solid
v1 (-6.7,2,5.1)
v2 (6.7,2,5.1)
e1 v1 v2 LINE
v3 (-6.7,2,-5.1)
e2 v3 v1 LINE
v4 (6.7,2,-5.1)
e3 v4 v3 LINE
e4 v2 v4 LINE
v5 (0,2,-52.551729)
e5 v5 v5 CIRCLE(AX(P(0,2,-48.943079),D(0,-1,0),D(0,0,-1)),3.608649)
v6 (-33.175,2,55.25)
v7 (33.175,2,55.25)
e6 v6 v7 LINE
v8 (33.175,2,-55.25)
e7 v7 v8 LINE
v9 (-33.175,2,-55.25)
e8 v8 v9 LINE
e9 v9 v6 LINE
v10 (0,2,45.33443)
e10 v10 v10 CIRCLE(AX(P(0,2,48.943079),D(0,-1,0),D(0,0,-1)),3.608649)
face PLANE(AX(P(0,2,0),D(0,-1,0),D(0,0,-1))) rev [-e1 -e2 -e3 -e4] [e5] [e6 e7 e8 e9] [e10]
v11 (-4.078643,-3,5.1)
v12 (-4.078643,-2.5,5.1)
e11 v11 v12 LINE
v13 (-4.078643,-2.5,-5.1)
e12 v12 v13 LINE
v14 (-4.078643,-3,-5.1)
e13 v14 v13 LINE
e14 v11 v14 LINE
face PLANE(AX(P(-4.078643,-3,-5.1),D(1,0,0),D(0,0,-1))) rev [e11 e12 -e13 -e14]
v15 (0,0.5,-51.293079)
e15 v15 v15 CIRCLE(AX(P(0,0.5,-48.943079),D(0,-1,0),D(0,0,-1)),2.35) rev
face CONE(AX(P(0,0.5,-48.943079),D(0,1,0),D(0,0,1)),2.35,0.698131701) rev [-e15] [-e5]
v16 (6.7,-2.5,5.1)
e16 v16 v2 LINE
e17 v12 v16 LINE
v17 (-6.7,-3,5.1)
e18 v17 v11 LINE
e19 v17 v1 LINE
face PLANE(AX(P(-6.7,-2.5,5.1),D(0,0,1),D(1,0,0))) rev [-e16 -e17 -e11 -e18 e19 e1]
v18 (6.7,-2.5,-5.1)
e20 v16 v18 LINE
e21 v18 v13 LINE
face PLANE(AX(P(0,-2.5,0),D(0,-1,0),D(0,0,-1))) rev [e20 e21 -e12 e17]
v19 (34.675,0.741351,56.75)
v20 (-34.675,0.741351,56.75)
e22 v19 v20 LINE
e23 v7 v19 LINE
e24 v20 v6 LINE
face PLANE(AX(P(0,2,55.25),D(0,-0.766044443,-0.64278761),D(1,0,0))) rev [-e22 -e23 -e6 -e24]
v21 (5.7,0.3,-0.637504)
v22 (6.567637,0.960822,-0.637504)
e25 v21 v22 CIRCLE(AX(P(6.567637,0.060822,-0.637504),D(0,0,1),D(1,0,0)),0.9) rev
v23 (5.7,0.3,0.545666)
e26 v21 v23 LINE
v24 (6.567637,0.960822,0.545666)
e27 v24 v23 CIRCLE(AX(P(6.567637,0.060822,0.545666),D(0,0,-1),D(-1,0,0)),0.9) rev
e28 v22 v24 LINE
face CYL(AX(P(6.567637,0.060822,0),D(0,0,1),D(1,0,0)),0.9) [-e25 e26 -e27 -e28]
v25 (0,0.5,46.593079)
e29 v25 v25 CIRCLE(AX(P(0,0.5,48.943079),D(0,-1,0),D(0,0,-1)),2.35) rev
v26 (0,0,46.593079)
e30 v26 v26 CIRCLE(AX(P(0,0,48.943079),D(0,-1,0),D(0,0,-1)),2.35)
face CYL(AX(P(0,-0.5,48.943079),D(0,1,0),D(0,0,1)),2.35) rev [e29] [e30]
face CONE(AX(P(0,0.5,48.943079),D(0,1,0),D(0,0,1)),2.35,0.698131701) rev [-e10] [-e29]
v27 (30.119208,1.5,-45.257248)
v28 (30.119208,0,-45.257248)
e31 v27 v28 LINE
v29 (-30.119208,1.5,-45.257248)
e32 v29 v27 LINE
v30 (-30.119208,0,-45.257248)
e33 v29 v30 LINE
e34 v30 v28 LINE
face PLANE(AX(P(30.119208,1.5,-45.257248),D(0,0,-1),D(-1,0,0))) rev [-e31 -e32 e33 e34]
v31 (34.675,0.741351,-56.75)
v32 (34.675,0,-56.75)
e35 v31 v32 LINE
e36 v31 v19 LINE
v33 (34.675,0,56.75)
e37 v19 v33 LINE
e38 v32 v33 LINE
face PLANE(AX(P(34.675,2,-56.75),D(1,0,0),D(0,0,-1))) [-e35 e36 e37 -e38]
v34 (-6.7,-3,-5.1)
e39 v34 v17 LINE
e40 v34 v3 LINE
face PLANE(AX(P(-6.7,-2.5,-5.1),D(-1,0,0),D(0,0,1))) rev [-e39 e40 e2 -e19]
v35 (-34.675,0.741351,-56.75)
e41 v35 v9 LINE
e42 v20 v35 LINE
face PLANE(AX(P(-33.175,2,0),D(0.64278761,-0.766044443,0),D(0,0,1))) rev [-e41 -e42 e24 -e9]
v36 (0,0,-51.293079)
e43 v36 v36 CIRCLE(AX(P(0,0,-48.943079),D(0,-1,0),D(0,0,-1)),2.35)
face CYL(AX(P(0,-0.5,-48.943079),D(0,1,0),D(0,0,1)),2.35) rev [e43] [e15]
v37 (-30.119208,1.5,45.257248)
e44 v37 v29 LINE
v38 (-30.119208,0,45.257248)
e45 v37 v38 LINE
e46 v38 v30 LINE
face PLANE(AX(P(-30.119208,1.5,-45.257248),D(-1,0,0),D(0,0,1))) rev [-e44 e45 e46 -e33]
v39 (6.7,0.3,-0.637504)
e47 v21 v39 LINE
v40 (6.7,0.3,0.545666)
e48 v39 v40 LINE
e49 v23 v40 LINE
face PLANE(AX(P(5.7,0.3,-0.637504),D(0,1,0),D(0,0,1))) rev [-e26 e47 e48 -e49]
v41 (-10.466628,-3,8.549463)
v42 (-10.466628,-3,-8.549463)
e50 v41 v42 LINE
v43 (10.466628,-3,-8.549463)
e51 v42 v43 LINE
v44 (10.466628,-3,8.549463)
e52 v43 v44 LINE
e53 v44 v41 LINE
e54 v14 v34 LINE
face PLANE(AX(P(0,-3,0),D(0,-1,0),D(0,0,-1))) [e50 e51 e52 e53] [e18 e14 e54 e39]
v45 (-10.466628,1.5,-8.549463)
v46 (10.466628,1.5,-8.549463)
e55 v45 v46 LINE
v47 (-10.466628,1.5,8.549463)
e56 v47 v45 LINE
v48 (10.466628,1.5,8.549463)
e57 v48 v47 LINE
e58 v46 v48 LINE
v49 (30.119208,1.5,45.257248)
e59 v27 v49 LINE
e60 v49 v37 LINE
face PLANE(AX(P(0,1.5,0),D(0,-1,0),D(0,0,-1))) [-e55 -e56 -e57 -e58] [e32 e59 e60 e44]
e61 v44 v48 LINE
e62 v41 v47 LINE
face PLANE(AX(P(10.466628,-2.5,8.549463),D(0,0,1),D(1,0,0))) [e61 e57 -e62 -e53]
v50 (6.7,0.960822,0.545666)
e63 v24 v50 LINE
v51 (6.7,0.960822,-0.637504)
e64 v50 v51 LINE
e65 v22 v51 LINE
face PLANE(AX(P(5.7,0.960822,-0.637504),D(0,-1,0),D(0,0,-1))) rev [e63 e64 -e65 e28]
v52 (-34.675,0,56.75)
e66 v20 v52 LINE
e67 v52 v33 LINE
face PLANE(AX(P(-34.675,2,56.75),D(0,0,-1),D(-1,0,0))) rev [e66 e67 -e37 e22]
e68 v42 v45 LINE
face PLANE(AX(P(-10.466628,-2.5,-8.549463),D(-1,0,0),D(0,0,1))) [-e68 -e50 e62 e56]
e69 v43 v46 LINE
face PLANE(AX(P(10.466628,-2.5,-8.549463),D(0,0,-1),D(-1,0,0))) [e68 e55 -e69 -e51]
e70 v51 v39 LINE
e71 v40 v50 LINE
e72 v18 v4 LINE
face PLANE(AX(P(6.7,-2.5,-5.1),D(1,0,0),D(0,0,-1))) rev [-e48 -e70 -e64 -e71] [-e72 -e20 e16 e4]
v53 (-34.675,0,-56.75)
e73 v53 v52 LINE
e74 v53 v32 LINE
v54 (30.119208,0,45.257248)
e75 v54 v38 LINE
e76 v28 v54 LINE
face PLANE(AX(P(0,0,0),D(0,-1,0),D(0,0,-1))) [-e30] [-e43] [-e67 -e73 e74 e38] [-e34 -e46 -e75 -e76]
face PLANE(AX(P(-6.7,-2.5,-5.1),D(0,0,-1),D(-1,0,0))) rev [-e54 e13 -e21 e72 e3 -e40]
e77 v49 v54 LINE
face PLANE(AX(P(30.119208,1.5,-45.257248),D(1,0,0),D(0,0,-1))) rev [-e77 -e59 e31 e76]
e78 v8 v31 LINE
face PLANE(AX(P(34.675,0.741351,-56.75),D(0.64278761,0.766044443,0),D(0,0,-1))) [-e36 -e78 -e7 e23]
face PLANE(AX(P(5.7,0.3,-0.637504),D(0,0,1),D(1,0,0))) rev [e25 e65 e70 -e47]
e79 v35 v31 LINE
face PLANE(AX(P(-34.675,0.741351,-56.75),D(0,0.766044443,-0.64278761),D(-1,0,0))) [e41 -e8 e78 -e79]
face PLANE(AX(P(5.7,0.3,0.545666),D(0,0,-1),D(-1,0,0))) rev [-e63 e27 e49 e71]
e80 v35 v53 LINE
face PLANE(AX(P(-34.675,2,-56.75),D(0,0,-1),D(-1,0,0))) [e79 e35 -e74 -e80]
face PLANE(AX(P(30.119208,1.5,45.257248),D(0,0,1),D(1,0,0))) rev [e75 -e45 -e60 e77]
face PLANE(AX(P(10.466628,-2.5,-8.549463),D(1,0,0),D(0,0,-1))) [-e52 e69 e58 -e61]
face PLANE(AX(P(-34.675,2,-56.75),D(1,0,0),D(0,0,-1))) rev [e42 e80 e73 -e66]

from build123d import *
from OCP.BRepFilletAPI import BRepFilletAPI_MakeChamfer

# Parameters (mm, degrees)
SKETCH1_W            = 69.35
SKETCH1_H            = 113.5
BOSS_EXTRUDE5_DEPTH  = 2
SKETCH2_R            = 2.35
CUT_EXTRUDE3_DEPTH   = 2.5
FACE_CHAMFER_SIZE    = 1.5
FACE_CHAMFER_SIZE2   = 1.258649447
SKETCH4_W            = 60.238416088
SKETCH4_H            = 90.514495008
CUT_EXTRUDE6_DEPTH   = 1.5
SKETCH5_W            = 20.93325514
SKETCH5_H            = 17.0989254
SKETCH5_W_2          = 13.4
SKETCH5_H_2          = 10.2
BOSS_EXTRUDE7_DEPTH  = 4.5
SKETCH6_W            = 13.4
SKETCH6_H            = 10.2
CUT_EXTRUDE7_DEPTH   = 4.1
SKETCH7_W            = 20.93325514
SKETCH7_H            = 17.0989254
BOSS_EXTRUDE8_DEPTH  = 0.5
SKETCH8_W            = 2.621357244
SKETCH8_H            = 10.2
CUT_EXTRUDE8_DEPTH   = 0.5
SKETCH10_W           = 1.18316995
SKETCH10_H           = 0.660821766
BOSS_EXTRUDE11_DEPTH = 1
FILLET1_R            = 0.9


with BuildPart() as part:
    # Sketch1 → Boss-Extrude5 (new body)
    with BuildSketch(Plane(origin=(0, 0, 0), x_dir=(1, 0, 0), z_dir=(0, 1, 0))):
        Rectangle(SKETCH1_W, SKETCH1_H)
    extrude(amount=BOSS_EXTRUDE5_DEPTH)

    # Sketch2 → Cut-Extrude3 (cut)
    with BuildSketch(Plane(origin=(0, 2, 0), x_dir=(1, 0, 0), z_dir=(0, 1, 0))):
        with Locations(Location((0, 48.943079059, 0), (0, 0, 270))):
            Circle(SKETCH2_R)
        with Locations(Location((0, -48.943079059, 0), (0, 0, 90))):
            Circle(SKETCH2_R)
    extrude(amount=-CUT_EXTRUDE3_DEPTH, mode=Mode.SUBTRACT)

    # face chamfer: one chamfer whose edges measure the first distance from different faces: ONE call of the kernel's chamfer builder (chamfer() names one face for all edges)
    face_chamfer_edges_1 = [part.edges().sort_by_distance(p)[0] for p in [
        (0, 2, -56.75),
        (-34.675, 2, 0),
        (0, 2, 56.75),
        (34.675, 2, 0),
    ]]
    face_chamfer_side_1 = [part.faces().sort_by_distance(p)[0] for p in [
        (0, 2, 0),
    ]]
    face_chamfer_edges_2 = [part.edges().sort_by_distance(p)[0] for p in [
        (0, 2, -51.293079059),
    ]]
    face_chamfer_side_2 = [part.faces().sort_by_distance(p)[0] for p in [
        (0, 1, -51.293079059),
    ]]
    face_chamfer_edges_3 = [part.edges().sort_by_distance(p)[0] for p in [
        (0, 2, 51.293079059),
    ]]
    face_chamfer_side_3 = [part.faces().sort_by_distance(p)[0] for p in [
        (0, 1, 51.293079059),
    ]]
    face_chamfer = BRepFilletAPI_MakeChamfer(part.part.solid().wrapped)
    for e in face_chamfer_edges_1:
        face_chamfer.Add(FACE_CHAMFER_SIZE, FACE_CHAMFER_SIZE2, e.wrapped, face_chamfer_side_1[0].wrapped)  # the first distance lies on this face
    for e in face_chamfer_edges_2:
        face_chamfer.Add(FACE_CHAMFER_SIZE, FACE_CHAMFER_SIZE2, e.wrapped, face_chamfer_side_2[0].wrapped)  # the first distance lies on this face
    for e in face_chamfer_edges_3:
        face_chamfer.Add(FACE_CHAMFER_SIZE, FACE_CHAMFER_SIZE2, e.wrapped, face_chamfer_side_3[0].wrapped)  # the first distance lies on this face
    add(Compound.cast(face_chamfer.Shape()), mode=Mode.REPLACE)

    # Sketch4 → Cut-Extrude6 (cut)
    with BuildSketch(Plane(origin=(0, 0, 0), x_dir=(-1, 0, 0), z_dir=(0, -1, 0))):
        Rectangle(SKETCH4_W, SKETCH4_H)
    extrude(amount=-CUT_EXTRUDE6_DEPTH, mode=Mode.SUBTRACT)

    # Sketch5 → Boss-Extrude7 (add)
    with BuildSketch(Plane(origin=(0, 2, 0), x_dir=(1, 0, 0), z_dir=(0, 1, 0))):
        Rectangle(SKETCH5_W, SKETCH5_H)
        Rectangle(SKETCH5_W_2, SKETCH5_H_2, mode=Mode.SUBTRACT)
    extrude(amount=-BOSS_EXTRUDE7_DEPTH)

    # Sketch6 → Cut-Extrude7 (cut)
    with BuildSketch(Plane(origin=(0, 2, 0), x_dir=(1, 0, 0), z_dir=(0, 1, 0))):
        Rectangle(SKETCH6_W, SKETCH6_H)
    extrude(amount=-CUT_EXTRUDE7_DEPTH, mode=Mode.SUBTRACT)

    # Sketch7 → Boss-Extrude8 (add)
    with BuildSketch(Plane.XZ.offset(2.5)):
        Rectangle(SKETCH7_W, SKETCH7_H)
    extrude(amount=BOSS_EXTRUDE8_DEPTH)

    # Sketch8 → Cut-Extrude8 (cut)
    with BuildSketch(Plane(origin=(0, -2.5, 0), x_dir=(1, 0, 0), z_dir=(0, 1, 0))):
        with Locations((-5.389321378, 0)):
            Rectangle(SKETCH8_W, SKETCH8_H)
    extrude(amount=-CUT_EXTRUDE8_DEPTH, mode=Mode.SUBTRACT)

    # Sketch10 → Boss-Extrude11 (add)
    with BuildSketch(Plane.ZY.offset(-6.7)):
        with Locations((-0.045919003, 0.630410883)):
            Rectangle(SKETCH10_W, SKETCH10_H)
    extrude(amount=BOSS_EXTRUDE11_DEPTH)

    # Fillet1
    # the kernel refuses this fillet: 0.9 mm, written as the material it takes off along each edge
    with BuildSketch(Plane(origin=(5.7, 0.960821766, 2.714758197), x_dir=(1, 0, 0), z_dir=(0, 0, -1))) as fillet1_piece_1:
        with BuildLine():
            CenterArc((0.86763689, 0.9), FILLET1_R, 195.411736224, 74.588263776)
            Line((0, 0.660821766), (-0.017352738, 0.656038202))
            ThreePointArc((-0.017352738, 0.656038202), (-0.018, 0.330410883), (-0.018, 0))
            Line((-0.018, 0), (0, -0.018))
            Line((0, -0.018), (0.86763689, -0.018))
            Line((0.86763689, -0.018), (0.86763689, 0))
        make_face()
    extrude(amount=5.521354399, mode=Mode.SUBTRACT)


solid = part.part
